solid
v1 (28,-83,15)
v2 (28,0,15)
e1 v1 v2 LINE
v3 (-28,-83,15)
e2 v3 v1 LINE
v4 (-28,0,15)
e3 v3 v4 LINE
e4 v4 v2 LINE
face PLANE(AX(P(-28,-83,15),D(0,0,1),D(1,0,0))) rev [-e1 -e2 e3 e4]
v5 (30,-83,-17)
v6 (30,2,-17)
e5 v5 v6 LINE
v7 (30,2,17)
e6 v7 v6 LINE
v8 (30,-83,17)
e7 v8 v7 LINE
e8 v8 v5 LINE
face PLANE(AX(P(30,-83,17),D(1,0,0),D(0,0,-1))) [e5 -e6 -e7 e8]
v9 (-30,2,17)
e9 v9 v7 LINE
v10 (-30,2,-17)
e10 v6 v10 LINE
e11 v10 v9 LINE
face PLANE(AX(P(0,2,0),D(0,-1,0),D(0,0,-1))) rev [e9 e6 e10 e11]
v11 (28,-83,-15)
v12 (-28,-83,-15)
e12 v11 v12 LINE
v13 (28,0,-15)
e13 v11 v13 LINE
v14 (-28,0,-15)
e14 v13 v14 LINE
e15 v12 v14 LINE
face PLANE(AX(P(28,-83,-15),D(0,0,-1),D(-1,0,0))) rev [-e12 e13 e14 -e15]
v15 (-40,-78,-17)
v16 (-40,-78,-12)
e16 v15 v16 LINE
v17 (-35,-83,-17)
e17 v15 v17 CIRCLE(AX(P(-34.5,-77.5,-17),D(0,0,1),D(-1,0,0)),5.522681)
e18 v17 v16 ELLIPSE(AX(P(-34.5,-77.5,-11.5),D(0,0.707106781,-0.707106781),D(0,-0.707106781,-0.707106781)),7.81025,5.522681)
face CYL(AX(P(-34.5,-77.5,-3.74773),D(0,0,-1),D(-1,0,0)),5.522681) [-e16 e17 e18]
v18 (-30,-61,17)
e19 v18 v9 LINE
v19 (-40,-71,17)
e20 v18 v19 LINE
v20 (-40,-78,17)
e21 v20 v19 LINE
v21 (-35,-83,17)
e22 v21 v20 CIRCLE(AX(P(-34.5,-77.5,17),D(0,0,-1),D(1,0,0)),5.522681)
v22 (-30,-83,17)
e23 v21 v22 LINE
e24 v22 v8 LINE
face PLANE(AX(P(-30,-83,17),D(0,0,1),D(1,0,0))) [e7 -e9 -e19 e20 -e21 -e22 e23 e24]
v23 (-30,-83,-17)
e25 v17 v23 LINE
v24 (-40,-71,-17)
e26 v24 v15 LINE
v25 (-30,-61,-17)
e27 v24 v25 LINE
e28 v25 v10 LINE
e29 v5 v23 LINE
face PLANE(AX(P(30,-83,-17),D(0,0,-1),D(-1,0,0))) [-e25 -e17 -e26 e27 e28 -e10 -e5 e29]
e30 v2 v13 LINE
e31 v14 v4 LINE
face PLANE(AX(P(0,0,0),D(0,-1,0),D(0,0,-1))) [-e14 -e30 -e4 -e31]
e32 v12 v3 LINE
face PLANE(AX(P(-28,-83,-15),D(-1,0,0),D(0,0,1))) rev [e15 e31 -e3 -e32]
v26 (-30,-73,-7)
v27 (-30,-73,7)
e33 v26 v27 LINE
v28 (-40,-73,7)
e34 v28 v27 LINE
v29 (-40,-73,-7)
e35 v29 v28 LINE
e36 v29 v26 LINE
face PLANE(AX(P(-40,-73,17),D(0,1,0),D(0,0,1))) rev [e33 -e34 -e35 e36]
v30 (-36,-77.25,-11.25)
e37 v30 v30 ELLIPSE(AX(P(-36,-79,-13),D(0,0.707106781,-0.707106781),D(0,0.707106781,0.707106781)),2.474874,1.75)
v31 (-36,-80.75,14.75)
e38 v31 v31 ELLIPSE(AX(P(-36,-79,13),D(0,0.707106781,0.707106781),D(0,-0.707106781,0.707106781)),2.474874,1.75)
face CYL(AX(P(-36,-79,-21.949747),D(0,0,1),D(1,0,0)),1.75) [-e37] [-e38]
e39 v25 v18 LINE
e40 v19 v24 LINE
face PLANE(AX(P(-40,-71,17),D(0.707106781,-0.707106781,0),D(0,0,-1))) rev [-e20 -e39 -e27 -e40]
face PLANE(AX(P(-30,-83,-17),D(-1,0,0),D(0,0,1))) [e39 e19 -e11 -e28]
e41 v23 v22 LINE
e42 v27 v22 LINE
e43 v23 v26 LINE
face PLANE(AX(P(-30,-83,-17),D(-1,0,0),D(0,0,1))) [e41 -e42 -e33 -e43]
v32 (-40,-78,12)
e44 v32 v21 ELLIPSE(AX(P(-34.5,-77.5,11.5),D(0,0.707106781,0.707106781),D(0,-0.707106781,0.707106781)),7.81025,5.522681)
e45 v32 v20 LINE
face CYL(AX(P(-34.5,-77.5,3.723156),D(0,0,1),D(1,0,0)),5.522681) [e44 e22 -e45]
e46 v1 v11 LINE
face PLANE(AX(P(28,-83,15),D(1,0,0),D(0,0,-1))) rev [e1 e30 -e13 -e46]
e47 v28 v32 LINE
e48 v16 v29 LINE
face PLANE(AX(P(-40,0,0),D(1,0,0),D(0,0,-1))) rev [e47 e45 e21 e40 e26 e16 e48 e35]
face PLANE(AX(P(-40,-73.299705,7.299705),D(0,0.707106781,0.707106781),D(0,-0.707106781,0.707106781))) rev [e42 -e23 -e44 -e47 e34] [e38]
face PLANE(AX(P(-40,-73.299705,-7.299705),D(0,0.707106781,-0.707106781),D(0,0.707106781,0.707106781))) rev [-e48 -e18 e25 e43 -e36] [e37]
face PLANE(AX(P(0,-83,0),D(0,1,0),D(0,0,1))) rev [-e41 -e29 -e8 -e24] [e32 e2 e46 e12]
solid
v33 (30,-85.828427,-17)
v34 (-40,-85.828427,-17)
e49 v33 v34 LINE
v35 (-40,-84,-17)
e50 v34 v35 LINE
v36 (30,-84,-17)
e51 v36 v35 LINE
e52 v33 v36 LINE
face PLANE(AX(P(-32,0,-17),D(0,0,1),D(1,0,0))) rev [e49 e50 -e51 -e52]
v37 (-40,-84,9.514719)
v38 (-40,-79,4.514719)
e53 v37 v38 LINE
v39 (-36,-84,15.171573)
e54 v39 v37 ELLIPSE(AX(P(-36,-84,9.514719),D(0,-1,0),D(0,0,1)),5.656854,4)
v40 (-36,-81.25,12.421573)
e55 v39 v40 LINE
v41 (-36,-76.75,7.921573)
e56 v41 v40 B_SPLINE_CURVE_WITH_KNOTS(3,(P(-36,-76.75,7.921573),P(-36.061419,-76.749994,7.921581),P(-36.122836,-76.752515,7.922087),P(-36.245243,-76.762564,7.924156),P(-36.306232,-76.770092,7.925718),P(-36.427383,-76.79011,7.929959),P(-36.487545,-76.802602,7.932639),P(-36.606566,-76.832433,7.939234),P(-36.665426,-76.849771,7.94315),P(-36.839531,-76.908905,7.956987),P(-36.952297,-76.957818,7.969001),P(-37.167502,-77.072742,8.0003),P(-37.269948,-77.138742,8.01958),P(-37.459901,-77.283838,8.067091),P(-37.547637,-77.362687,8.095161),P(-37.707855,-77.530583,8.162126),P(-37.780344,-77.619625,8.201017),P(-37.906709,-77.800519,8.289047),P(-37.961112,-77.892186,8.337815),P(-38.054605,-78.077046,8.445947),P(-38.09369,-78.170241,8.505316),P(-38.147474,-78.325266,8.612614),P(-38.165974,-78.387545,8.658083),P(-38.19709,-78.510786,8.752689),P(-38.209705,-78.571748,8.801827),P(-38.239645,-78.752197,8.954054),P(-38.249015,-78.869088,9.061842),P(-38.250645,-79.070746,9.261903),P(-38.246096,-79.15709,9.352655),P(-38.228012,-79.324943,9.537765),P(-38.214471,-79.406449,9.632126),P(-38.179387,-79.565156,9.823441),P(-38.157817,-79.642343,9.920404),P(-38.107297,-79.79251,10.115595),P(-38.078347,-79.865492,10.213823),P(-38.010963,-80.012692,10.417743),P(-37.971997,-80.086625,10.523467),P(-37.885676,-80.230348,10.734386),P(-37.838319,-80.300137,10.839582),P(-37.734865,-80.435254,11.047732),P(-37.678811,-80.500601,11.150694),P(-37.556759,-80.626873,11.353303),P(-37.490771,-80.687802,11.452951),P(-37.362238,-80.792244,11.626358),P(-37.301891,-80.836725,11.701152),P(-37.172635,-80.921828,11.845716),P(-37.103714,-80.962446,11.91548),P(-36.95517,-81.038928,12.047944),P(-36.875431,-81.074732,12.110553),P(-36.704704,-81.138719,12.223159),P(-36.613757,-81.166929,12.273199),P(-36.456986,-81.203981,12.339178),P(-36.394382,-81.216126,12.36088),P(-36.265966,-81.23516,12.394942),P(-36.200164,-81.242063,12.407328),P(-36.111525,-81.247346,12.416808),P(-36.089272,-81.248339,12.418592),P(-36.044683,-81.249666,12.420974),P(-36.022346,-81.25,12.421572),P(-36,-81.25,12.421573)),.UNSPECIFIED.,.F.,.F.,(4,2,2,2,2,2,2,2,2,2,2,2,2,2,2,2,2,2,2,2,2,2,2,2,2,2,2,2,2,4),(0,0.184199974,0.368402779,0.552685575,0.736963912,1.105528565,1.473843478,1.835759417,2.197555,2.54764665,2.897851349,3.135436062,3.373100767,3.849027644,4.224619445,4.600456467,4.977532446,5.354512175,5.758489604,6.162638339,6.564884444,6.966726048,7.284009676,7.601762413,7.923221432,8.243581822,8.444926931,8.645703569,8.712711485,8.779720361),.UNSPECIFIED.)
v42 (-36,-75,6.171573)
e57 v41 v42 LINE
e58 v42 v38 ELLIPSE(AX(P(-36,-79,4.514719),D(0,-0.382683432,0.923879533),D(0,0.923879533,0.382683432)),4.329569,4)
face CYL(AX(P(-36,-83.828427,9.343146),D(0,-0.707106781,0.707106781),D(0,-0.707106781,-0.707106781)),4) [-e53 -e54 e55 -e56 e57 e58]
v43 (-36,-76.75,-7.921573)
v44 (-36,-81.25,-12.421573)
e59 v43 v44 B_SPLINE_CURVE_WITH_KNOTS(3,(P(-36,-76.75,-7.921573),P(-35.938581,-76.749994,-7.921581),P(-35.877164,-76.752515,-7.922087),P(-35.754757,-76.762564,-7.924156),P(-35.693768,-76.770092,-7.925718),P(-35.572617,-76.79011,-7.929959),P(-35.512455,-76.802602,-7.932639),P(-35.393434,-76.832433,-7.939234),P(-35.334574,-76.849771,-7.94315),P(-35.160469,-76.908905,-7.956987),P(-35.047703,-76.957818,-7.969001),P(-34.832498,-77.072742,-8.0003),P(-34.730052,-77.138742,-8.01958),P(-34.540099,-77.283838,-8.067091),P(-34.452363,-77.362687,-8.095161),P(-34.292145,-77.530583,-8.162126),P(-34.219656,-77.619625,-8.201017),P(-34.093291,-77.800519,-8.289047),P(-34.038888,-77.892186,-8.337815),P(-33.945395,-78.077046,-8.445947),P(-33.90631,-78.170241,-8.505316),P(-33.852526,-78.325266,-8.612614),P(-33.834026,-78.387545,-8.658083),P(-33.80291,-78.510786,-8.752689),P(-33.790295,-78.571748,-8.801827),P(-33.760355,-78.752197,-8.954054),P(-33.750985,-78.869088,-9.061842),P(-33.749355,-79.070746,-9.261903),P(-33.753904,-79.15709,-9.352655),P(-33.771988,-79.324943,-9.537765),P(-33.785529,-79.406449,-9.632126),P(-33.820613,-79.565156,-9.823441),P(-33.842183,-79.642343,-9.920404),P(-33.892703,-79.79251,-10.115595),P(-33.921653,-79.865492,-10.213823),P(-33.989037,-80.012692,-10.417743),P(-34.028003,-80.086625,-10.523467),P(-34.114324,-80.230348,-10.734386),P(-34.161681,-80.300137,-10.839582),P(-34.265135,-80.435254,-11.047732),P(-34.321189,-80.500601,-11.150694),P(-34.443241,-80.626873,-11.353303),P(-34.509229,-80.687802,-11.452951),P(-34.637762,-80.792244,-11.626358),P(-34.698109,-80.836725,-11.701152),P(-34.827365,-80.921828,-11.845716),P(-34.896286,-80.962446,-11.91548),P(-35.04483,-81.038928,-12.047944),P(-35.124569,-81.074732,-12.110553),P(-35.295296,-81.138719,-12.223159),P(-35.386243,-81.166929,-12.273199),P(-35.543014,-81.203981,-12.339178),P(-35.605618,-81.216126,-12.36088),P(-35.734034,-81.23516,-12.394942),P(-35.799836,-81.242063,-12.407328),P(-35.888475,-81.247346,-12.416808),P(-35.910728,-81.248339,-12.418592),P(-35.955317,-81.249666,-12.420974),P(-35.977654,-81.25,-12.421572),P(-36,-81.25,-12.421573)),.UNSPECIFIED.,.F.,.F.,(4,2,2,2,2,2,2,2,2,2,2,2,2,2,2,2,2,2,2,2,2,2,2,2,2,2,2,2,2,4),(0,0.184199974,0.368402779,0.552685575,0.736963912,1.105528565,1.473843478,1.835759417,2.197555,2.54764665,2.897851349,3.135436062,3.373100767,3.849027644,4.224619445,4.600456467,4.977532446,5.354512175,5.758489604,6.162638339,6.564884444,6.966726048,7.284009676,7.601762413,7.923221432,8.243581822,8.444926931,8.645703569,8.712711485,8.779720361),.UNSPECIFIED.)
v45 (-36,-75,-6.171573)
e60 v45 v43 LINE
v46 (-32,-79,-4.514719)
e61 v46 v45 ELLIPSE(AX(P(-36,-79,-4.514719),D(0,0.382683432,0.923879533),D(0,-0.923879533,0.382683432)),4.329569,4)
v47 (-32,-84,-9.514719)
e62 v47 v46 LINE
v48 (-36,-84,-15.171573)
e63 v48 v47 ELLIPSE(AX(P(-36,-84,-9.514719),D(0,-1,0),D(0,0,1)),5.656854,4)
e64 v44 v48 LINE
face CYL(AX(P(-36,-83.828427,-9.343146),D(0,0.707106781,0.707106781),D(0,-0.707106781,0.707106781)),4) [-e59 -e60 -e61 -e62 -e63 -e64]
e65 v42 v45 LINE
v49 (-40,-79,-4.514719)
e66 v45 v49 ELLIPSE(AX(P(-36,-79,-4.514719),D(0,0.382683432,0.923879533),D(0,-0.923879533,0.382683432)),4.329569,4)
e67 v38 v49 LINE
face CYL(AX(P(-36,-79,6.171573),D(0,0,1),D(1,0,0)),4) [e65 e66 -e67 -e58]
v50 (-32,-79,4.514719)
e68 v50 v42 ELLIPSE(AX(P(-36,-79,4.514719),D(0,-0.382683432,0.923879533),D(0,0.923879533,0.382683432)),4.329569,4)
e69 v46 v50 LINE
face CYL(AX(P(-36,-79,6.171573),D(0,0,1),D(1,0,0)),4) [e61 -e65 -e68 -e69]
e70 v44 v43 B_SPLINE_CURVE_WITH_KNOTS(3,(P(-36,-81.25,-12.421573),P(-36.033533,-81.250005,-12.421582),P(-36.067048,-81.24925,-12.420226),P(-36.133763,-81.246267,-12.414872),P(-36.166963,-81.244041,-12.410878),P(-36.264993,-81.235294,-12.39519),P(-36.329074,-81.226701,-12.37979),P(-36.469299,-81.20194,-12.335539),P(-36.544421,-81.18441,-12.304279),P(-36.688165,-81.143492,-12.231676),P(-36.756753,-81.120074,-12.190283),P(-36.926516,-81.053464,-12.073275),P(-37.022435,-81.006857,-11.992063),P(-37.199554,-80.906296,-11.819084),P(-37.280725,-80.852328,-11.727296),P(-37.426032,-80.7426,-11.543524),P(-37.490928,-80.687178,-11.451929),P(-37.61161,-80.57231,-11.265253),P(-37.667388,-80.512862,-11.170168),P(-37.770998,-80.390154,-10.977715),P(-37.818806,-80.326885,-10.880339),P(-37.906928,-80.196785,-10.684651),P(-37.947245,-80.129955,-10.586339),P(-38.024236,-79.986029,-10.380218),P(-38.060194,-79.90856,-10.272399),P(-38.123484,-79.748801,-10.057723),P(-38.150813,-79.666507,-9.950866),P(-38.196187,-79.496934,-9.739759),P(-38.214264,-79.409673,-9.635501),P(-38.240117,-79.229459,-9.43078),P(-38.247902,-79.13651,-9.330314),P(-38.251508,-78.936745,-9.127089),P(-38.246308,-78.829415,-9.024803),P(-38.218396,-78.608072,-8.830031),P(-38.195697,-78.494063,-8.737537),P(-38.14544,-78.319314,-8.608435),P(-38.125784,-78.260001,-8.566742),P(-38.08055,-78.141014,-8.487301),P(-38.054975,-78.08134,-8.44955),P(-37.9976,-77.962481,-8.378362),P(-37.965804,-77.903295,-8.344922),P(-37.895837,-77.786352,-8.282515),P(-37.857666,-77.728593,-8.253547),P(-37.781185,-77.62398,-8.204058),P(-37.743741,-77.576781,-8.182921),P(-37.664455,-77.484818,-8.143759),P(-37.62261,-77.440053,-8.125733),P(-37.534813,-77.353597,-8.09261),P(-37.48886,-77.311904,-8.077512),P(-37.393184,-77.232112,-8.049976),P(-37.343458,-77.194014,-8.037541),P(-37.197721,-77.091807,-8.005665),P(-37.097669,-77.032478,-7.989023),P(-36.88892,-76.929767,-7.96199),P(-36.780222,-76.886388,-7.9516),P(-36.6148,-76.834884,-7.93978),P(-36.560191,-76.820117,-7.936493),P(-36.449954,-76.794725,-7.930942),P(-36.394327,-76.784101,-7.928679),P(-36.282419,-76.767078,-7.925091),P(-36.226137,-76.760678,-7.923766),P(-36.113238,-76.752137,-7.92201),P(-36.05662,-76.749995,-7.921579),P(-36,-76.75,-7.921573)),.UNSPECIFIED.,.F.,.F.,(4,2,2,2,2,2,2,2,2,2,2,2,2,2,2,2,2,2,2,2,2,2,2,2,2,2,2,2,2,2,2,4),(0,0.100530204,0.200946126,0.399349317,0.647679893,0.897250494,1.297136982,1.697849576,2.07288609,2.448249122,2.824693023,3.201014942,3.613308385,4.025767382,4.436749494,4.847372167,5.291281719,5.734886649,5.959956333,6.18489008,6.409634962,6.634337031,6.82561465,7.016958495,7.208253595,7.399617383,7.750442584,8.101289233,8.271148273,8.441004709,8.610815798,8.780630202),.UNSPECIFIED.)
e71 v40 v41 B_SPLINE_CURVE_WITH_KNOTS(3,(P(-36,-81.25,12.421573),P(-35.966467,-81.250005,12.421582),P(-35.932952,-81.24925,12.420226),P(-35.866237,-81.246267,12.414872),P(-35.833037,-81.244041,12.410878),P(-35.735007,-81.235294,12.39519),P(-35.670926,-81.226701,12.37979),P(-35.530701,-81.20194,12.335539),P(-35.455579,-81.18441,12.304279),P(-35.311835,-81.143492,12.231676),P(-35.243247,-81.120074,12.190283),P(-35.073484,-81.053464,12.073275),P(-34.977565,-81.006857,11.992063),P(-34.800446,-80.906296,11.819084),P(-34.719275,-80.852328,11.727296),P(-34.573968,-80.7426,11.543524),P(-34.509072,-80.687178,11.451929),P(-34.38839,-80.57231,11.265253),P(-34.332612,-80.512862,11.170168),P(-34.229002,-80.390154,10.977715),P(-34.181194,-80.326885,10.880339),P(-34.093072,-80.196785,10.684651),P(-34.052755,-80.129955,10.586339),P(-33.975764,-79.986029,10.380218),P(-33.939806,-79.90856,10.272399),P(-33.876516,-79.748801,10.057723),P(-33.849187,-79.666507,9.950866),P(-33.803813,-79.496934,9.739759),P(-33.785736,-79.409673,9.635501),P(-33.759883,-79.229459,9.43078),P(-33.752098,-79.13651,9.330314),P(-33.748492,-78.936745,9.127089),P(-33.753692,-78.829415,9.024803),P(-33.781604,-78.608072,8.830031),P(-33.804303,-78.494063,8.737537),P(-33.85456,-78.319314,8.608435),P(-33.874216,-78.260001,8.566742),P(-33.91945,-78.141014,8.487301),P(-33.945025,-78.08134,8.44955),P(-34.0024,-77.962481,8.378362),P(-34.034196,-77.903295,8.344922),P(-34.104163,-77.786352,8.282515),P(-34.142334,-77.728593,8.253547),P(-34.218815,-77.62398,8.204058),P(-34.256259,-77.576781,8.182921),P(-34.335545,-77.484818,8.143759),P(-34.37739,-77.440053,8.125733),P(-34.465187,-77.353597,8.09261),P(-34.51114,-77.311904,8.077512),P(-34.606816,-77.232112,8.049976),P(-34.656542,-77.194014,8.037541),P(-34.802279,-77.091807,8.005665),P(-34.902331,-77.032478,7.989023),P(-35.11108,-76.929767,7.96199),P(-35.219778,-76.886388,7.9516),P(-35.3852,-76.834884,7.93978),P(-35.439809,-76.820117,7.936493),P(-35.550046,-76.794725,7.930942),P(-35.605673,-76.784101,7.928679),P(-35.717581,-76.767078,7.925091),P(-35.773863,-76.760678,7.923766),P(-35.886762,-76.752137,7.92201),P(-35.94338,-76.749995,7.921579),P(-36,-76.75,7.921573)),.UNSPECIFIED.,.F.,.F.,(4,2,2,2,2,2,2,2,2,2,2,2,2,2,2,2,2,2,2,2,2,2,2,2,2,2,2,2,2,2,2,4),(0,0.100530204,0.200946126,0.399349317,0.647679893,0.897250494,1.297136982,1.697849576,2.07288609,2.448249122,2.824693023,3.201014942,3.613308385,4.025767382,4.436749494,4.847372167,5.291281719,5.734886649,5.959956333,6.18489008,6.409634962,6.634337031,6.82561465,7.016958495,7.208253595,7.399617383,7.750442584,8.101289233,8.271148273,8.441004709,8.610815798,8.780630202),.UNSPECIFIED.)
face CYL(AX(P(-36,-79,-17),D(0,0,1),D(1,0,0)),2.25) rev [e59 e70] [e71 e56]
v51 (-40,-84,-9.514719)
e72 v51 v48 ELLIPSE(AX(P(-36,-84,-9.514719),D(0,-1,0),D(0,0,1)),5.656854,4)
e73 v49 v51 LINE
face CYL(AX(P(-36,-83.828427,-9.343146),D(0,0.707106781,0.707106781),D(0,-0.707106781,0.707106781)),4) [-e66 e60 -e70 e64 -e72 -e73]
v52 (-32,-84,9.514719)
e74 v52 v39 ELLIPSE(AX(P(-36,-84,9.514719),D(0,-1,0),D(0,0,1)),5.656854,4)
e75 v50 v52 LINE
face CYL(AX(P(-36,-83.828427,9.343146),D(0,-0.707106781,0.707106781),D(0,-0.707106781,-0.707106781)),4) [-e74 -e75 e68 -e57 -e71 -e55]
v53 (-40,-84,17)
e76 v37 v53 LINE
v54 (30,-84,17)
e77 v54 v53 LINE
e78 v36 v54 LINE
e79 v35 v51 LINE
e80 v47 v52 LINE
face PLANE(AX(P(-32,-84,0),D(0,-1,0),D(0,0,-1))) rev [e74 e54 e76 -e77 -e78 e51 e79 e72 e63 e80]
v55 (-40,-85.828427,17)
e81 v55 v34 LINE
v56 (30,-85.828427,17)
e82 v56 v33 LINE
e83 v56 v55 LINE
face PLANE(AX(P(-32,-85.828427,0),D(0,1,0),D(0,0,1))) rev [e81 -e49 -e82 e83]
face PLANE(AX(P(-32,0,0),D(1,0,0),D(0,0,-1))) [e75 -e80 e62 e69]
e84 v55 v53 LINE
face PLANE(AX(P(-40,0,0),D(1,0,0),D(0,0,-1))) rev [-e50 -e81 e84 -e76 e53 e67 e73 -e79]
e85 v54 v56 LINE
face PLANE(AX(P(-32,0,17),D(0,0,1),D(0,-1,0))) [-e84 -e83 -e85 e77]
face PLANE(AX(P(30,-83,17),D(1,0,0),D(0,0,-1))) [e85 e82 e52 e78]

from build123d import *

# Parameters (mm, degrees)
SKETCH1_W            = 56
SKETCH1_H            = 30
BOSS_EXTRUDE1_DEPTH  = 2
SKETCH2_W            = 60
SKETCH2_H            = 34
SKETCH2_W_2          = 56
SKETCH2_H_2          = 30
BOSS_EXTRUDE2_DEPTH  = 85
BOSS_EXTRUDE3_DEPTH  = 10
SKETCH5_W            = 34
SKETCH5_H            = 2
BOSS_EXTRUDE5_DEPTH  = 10
CHAMFER2_SIZE        = 10
BOSS_EXTRUDE6_START  = 2
BOSS_EXTRUDE6_DEPTH  = 8
SKETCH7_R            = 2.25
CUT_EXTRUDE1_DEPTH   = 99.208960895
BOSS_EXTRUDE7_REACH  = 100.209
SKETCH9_R            = 2.25
BOSS_EXTRUDE8_REACH  = 100.209
SKETCH10_R           = 2.25
BOSS_EXTRUDE9_REACH  = 100.209
SKETCH11_R           = 1.75
SKETCH12_W           = 8
SKETCH12_H           = 28.34314575
BOSS_EXTRUDE10_DEPTH = 1
BOSS_EXTRUDE11_DEPTH = 8
SKETCH14_W           = 34
SKETCH14_H           = 1.828427125
BOSS_EXTRUDE12_DEPTH = 62
FILLET1_R            = 4
CUT_EXTRUDE2_REACH   = 102.611
CUT_EXTRUDE3_REACH   = 102.611


# Some blends are built 0.0001 mm under size
with BuildPart() as part:
    # Sketch1 → Boss-Extrude1 (new body)
    with BuildSketch(Plane(origin=(0, 0, 0), x_dir=(1, 0, 0), z_dir=(0, 1, 0))):
        Rectangle(SKETCH1_W, SKETCH1_H)
    extrude(amount=BOSS_EXTRUDE1_DEPTH)

    # Sketch2 → Boss-Extrude2 (add)
    with BuildSketch(Plane(origin=(0, 2, 0), x_dir=(1, 0, 0), z_dir=(0, 1, 0))):
        Rectangle(SKETCH2_W, SKETCH2_H)
        Rectangle(SKETCH2_W_2, SKETCH2_H_2, mode=Mode.SUBTRACT)
    extrude(amount=-BOSS_EXTRUDE2_DEPTH)

    # Sketch3 → Boss-Extrude3 (add)
    with BuildSketch(Plane.ZY.offset(30)):
        Polygon((17, -83), (17, -73), (7.299704714, -73), (7, -73), (7.299704714, -73.299704714), align=None)
        Polygon((-17, -73), (-17, -83), (-10.046245332, -76.046245332), (-7.299704714, -73.299704714), (-7, -73), (-7.299704714, -73), align=None)
    extrude(amount=BOSS_EXTRUDE3_DEPTH)

    # Sketch5 → Boss-Extrude5 (add)
    with BuildSketch(Plane.ZY.offset(30)):
        with Locations((0, -72)):
            Rectangle(SKETCH5_W, SKETCH5_H)
    extrude(amount=BOSS_EXTRUDE5_DEPTH)

    # Chamfer2
    chamfer2_edges = [part.edges().sort_by_distance(p)[0] for p in [
        (-30, -71, 0),
    ]]
    chamfer(chamfer2_edges, length=CHAMFER2_SIZE - 0.0001)  # a hair under: the kernel refuses the full size


with BuildPart() as body_2:
    # Sketch6 → Boss-Extrude6 (new body)
    with BuildSketch(Plane.ZY.offset(30).offset(BOSS_EXTRUDE6_START)):
        Polygon((12.171572875, -81), (14.171572875, -83), (-14.171572875, -83), (-12.171572875, -81), (-6.171572875, -75), (6.171572875, -75), align=None)
    extrude(amount=BOSS_EXTRUDE6_DEPTH)


with BuildPart() as cut_extrude1_tool:
    # Sketch7 → Cut-Extrude1 (new, through all)
    with BuildSketch(Plane.XY.offset(17)):
        with Locations(Location((-36, -79, 0), (0, 0, 270))):
            Circle(SKETCH7_R)
    extrude(amount=-CUT_EXTRUDE1_DEPTH)


with BuildPart() as part_1:
    add(part.part)

    # Cut-Extrude1: cut by cut_extrude1_tool
    add(cut_extrude1_tool.part, mode=Mode.SUBTRACT)

    # Boss-Extrude7: up to this face of the body (flat: up to its plane)
    boss_extrude7_end = Plane(part_1.part.faces().sort_by_distance((-35, -73.122474487, 7.122474487))[0])
    # Sketch9 → Boss-Extrude7 (add, up to the picked face)
    with BuildSketch(Plane.XY.offset(17), mode=Mode.PRIVATE) as boss_extrude7_sk1:
        with Locations(Location((-36, -79, 0), (0, 0, 270))):
            Circle(SKETCH9_R)
    boss_extrude7_tool1 = split(extrude(boss_extrude7_sk1.sketch, amount=-BOSS_EXTRUDE7_REACH, mode=Mode.PRIVATE), bisect_by=boss_extrude7_end, keep=Keep.BOTH, mode=Mode.PRIVATE)
    add(boss_extrude7_tool1.solids().sort_by(Axis((-36, -79, 17), (0, 0, -1)))[0])

    # Boss-Extrude8: up to this face of the body (flat: up to its plane)
    boss_extrude8_end = Plane(part_1.part.faces().sort_by_distance((-35, -82.877525513, -16.877525513))[0])
    # Sketch10 → Boss-Extrude8 (add, up to the picked face)
    with BuildSketch(Plane(origin=(0, 0, -17), x_dir=(-1, 0, 0), z_dir=(0, 0, -1)), mode=Mode.PRIVATE) as boss_extrude8_sk1:
        with Locations(Location((36, -79, 0), (0, 0, 270))):
            Circle(SKETCH10_R)
    boss_extrude8_tool1 = split(extrude(boss_extrude8_sk1.sketch, amount=-BOSS_EXTRUDE8_REACH, mode=Mode.PRIVATE), bisect_by=boss_extrude8_end, keep=Keep.BOTH, mode=Mode.PRIVATE)
    add(boss_extrude8_tool1.solids().sort_by(Axis((-36, -79, -17), (0, 0, 1)))[0])

    # Boss-Extrude9: up to this plane
    boss_extrude9_end = Plane(origin=(-40, -73.299704714, -7.299704714), z_dir=(0, 0.7071067811867726, -0.7071067811863224))
    # Sketch11 → Boss-Extrude9 (add, up to the surface)
    with BuildSketch(Plane.XY.offset(17), mode=Mode.PRIVATE) as boss_extrude9_sk1:
        with Locations(Location((-36, -79, 0), (0, 0, 90))):
            Circle(SKETCH11_R)
    boss_extrude9_tool1 = split(extrude(boss_extrude9_sk1.sketch, amount=-BOSS_EXTRUDE9_REACH, mode=Mode.PRIVATE), bisect_by=boss_extrude9_end, keep=Keep.BOTH, mode=Mode.PRIVATE)
    add(boss_extrude9_tool1.solids().sort_by_distance((-36, -79, 17))[0])

    # Cut-Extrude2: up to this face of the body (flat: up to its plane)
    cut_extrude2_end = Plane(part_1.part.faces().sort_by_distance((-35, -73.122474487, 7.122474487))[0])
    # Sketch15 → Cut-Extrude2 (cut, up to the picked face)
    with BuildSketch(Plane.XY.offset(17), mode=Mode.PRIVATE) as cut_extrude2_sk1:
        with BuildLine():
            Line((-40, -77), (-40.95825687, -78.42919066))
            Line((-40.95825687, -78.42919066), (-40.221590292, -83.192087083))
            Line((-40.221590292, -83.192087083), (-35, -83))
            ThreePointArc((-35, -83), (-38.742640687, -81.035533906), (-40, -77))
        make_face()
    cut_extrude2_tool1 = split(extrude(cut_extrude2_sk1.sketch, amount=-CUT_EXTRUDE2_REACH, mode=Mode.PRIVATE), bisect_by=cut_extrude2_end, keep=Keep.BOTH, mode=Mode.PRIVATE)
    add(cut_extrude2_tool1.solids().sort_by(Axis((-39.293992, -81.193601, 17), (0, 0, -1)))[0], mode=Mode.SUBTRACT)

    # Cut-Extrude3: up to this face of the body (flat: up to its plane)
    cut_extrude3_end = Plane(part_1.part.faces().sort_by_distance((-35, -82.877525513, -16.877525513))[0])
    # Sketch16 → Cut-Extrude3 (cut, up to the picked face)
    with BuildSketch(Plane(origin=(0, 0, -17), x_dir=(-1, 0, 0), z_dir=(0, 0, -1)), mode=Mode.PRIVATE) as cut_extrude3_sk1:
        with BuildLine():
            Line((40, -77), (40.921238038, -77.921238038))
            Line((40.921238038, -77.921238038), (40.171531484, -83.209136239))
            Line((40.171531484, -83.209136239), (35, -83))
            ThreePointArc((35, -83), (38.742640687, -81.035533906), (40, -77))
        make_face()
    cut_extrude3_tool1 = split(extrude(cut_extrude3_sk1.sketch, amount=-CUT_EXTRUDE3_REACH, mode=Mode.PRIVATE), bisect_by=cut_extrude3_end, keep=Keep.BOTH, mode=Mode.PRIVATE)
    add(cut_extrude3_tool1.solids().sort_by(Axis((-39.266002, -81.163478, -17), (0, 0, 1)))[0], mode=Mode.SUBTRACT)


with BuildPart() as body_2_1:
    add(body_2.part)

    # Cut-Extrude1: cut by cut_extrude1_tool
    add(cut_extrude1_tool.part, mode=Mode.SUBTRACT)

    # Sketch12 → Boss-Extrude10 (add)
    with BuildSketch(Plane.XZ.offset(83)):
        with Locations((-36, 0)):
            Rectangle(SKETCH12_W, SKETCH12_H)
    extrude(amount=BOSS_EXTRUDE10_DEPTH)

    # Sketch13 → Boss-Extrude11 (add)
    with BuildSketch(Plane.ZY.offset(40)):
        Polygon((17, -85.828427125), (-17, -85.828427125), (-17, -84), (-15.171572875, -84), (-14.171572875, -83), (-14.171572875, -84), (14.171572875, -84), (14.171572875, -83), (15.171572875, -84), (17, -84), align=None)
    extrude(amount=-BOSS_EXTRUDE11_DEPTH)

    # Sketch14 → Boss-Extrude12 (add)
    with BuildSketch(Plane(origin=(-32, 0, 0), x_dir=(0, 0, -1), z_dir=(1, 0, 0))):
        with Locations((0, -84.914213563)):
            Rectangle(SKETCH14_W, SKETCH14_H)
    extrude(amount=BOSS_EXTRUDE12_DEPTH)

    # Fillet1
    # the kernel refuses this fillet: 4 mm, written as the material it takes off along each edge
    with BuildSketch(Plane(origin=(-40, -67.928932188, -0.899494937), x_dir=(1, 0, 0), z_dir=(0, -0.7071067811865429, 0.7071067811865522))) as fillet1_piece_1_section:
        with BuildLine():
            CenterArc((FILLET1_R, -FILLET1_R), FILLET1_R, 90, 90)
            Line((0, -FILLET1_R), (0, 0))
            Line((0, 0), (FILLET1_R, 0))
        make_face()
    fillet1_piece_1 = extrude(amount=32.727922061, mode=Mode.PRIVATE)
    fillet1_piece_1 = split(fillet1_piece_1, bisect_by=Plane(origin=(-39.176171252, -84, 9.384724786), z_dir=(0, 1, 0)), keep=Keep.TOP, mode=Mode.PRIVATE)
    add(fillet1_piece_1, mode=Mode.SUBTRACT)
    with BuildSketch(Plane(origin=(-32, -91.071067812, 22.242640687), x_dir=(-1, 0, 0), z_dir=(0, 0.7071067811865429, -0.7071067811865522))) as fillet1_piece_2_section:
        with BuildLine():
            CenterArc((FILLET1_R, -FILLET1_R), FILLET1_R, 90, 90)
            Line((0, -FILLET1_R), (0, 0))
            Line((0, 0), (FILLET1_R, 0))
        make_face()
    fillet1_piece_2 = extrude(amount=32.727922061, mode=Mode.PRIVATE)
    fillet1_piece_2 = split(fillet1_piece_2, bisect_by=Plane(origin=(-32.823830813, -84, 9.384729288), z_dir=(0, 1, 0)), keep=Keep.TOP, mode=Mode.PRIVATE)
    add(fillet1_piece_2, mode=Mode.SUBTRACT)
    with BuildSketch(Plane(origin=(-32, -91.071067812, -22.242640687), x_dir=(-1, 0, 0), z_dir=(0, 0.7071067811865529, 0.7071067811865422))) as fillet1_piece_3_section:
        with BuildLine():
            CenterArc((FILLET1_R, FILLET1_R), FILLET1_R, 180, 90)
            Line((0, FILLET1_R), (0, 0))
            Line((0, 0), (FILLET1_R, 0))
        make_face()
    fillet1_piece_3 = extrude(amount=32.727922061, mode=Mode.PRIVATE)
    fillet1_piece_3 = split(fillet1_piece_3, bisect_by=Plane(origin=(-32.823830813, -84, -9.384729288), z_dir=(0, 1, 0)), keep=Keep.TOP, mode=Mode.PRIVATE)
    add(fillet1_piece_3, mode=Mode.SUBTRACT)
    with BuildSketch(Plane(origin=(-40, -67.928932188, 0.899494937), x_dir=(1, 0, 0), z_dir=(0, -0.7071067811865529, -0.7071067811865422))) as fillet1_piece_4_section:
        with BuildLine():
            CenterArc((FILLET1_R, FILLET1_R), FILLET1_R, 180, 90)
            Line((0, FILLET1_R), (0, 0))
            Line((0, 0), (FILLET1_R, 0))
        make_face()
    fillet1_piece_4 = extrude(amount=32.727922061, mode=Mode.PRIVATE)
    fillet1_piece_4 = split(fillet1_piece_4, bisect_by=Plane(origin=(-39.176171252, -84, -9.384724786), z_dir=(0, 1, 0)), keep=Keep.TOP, mode=Mode.PRIVATE)
    add(fillet1_piece_4, mode=Mode.SUBTRACT)
    with BuildSketch(Plane(origin=(-40, -75, -16.171572875), x_dir=(0, -1, 0), z_dir=(0, 0, 1))) as fillet1_piece_5:
        with BuildLine():
            CenterArc((FILLET1_R, FILLET1_R), FILLET1_R, 180, 90)
            Line((0, FILLET1_R), (0, 0))
            Line((0, 0), (FILLET1_R, 0))
        make_face()
    extrude(amount=32.343145751, mode=Mode.SUBTRACT)
    with BuildSketch(Plane(origin=(-32, -75, -16.171572875), x_dir=(0, -1, 0), z_dir=(0, 0, 1))) as fillet1_piece_6:
        with BuildLine():
            CenterArc((FILLET1_R, -FILLET1_R), FILLET1_R, 90, 90)
            Line((0, -FILLET1_R), (0, 0))
            Line((0, 0), (FILLET1_R, 0))
        make_face()
    extrude(amount=32.343145751, mode=Mode.SUBTRACT)


solid = Compound([part_1.part, body_2_1.part])
